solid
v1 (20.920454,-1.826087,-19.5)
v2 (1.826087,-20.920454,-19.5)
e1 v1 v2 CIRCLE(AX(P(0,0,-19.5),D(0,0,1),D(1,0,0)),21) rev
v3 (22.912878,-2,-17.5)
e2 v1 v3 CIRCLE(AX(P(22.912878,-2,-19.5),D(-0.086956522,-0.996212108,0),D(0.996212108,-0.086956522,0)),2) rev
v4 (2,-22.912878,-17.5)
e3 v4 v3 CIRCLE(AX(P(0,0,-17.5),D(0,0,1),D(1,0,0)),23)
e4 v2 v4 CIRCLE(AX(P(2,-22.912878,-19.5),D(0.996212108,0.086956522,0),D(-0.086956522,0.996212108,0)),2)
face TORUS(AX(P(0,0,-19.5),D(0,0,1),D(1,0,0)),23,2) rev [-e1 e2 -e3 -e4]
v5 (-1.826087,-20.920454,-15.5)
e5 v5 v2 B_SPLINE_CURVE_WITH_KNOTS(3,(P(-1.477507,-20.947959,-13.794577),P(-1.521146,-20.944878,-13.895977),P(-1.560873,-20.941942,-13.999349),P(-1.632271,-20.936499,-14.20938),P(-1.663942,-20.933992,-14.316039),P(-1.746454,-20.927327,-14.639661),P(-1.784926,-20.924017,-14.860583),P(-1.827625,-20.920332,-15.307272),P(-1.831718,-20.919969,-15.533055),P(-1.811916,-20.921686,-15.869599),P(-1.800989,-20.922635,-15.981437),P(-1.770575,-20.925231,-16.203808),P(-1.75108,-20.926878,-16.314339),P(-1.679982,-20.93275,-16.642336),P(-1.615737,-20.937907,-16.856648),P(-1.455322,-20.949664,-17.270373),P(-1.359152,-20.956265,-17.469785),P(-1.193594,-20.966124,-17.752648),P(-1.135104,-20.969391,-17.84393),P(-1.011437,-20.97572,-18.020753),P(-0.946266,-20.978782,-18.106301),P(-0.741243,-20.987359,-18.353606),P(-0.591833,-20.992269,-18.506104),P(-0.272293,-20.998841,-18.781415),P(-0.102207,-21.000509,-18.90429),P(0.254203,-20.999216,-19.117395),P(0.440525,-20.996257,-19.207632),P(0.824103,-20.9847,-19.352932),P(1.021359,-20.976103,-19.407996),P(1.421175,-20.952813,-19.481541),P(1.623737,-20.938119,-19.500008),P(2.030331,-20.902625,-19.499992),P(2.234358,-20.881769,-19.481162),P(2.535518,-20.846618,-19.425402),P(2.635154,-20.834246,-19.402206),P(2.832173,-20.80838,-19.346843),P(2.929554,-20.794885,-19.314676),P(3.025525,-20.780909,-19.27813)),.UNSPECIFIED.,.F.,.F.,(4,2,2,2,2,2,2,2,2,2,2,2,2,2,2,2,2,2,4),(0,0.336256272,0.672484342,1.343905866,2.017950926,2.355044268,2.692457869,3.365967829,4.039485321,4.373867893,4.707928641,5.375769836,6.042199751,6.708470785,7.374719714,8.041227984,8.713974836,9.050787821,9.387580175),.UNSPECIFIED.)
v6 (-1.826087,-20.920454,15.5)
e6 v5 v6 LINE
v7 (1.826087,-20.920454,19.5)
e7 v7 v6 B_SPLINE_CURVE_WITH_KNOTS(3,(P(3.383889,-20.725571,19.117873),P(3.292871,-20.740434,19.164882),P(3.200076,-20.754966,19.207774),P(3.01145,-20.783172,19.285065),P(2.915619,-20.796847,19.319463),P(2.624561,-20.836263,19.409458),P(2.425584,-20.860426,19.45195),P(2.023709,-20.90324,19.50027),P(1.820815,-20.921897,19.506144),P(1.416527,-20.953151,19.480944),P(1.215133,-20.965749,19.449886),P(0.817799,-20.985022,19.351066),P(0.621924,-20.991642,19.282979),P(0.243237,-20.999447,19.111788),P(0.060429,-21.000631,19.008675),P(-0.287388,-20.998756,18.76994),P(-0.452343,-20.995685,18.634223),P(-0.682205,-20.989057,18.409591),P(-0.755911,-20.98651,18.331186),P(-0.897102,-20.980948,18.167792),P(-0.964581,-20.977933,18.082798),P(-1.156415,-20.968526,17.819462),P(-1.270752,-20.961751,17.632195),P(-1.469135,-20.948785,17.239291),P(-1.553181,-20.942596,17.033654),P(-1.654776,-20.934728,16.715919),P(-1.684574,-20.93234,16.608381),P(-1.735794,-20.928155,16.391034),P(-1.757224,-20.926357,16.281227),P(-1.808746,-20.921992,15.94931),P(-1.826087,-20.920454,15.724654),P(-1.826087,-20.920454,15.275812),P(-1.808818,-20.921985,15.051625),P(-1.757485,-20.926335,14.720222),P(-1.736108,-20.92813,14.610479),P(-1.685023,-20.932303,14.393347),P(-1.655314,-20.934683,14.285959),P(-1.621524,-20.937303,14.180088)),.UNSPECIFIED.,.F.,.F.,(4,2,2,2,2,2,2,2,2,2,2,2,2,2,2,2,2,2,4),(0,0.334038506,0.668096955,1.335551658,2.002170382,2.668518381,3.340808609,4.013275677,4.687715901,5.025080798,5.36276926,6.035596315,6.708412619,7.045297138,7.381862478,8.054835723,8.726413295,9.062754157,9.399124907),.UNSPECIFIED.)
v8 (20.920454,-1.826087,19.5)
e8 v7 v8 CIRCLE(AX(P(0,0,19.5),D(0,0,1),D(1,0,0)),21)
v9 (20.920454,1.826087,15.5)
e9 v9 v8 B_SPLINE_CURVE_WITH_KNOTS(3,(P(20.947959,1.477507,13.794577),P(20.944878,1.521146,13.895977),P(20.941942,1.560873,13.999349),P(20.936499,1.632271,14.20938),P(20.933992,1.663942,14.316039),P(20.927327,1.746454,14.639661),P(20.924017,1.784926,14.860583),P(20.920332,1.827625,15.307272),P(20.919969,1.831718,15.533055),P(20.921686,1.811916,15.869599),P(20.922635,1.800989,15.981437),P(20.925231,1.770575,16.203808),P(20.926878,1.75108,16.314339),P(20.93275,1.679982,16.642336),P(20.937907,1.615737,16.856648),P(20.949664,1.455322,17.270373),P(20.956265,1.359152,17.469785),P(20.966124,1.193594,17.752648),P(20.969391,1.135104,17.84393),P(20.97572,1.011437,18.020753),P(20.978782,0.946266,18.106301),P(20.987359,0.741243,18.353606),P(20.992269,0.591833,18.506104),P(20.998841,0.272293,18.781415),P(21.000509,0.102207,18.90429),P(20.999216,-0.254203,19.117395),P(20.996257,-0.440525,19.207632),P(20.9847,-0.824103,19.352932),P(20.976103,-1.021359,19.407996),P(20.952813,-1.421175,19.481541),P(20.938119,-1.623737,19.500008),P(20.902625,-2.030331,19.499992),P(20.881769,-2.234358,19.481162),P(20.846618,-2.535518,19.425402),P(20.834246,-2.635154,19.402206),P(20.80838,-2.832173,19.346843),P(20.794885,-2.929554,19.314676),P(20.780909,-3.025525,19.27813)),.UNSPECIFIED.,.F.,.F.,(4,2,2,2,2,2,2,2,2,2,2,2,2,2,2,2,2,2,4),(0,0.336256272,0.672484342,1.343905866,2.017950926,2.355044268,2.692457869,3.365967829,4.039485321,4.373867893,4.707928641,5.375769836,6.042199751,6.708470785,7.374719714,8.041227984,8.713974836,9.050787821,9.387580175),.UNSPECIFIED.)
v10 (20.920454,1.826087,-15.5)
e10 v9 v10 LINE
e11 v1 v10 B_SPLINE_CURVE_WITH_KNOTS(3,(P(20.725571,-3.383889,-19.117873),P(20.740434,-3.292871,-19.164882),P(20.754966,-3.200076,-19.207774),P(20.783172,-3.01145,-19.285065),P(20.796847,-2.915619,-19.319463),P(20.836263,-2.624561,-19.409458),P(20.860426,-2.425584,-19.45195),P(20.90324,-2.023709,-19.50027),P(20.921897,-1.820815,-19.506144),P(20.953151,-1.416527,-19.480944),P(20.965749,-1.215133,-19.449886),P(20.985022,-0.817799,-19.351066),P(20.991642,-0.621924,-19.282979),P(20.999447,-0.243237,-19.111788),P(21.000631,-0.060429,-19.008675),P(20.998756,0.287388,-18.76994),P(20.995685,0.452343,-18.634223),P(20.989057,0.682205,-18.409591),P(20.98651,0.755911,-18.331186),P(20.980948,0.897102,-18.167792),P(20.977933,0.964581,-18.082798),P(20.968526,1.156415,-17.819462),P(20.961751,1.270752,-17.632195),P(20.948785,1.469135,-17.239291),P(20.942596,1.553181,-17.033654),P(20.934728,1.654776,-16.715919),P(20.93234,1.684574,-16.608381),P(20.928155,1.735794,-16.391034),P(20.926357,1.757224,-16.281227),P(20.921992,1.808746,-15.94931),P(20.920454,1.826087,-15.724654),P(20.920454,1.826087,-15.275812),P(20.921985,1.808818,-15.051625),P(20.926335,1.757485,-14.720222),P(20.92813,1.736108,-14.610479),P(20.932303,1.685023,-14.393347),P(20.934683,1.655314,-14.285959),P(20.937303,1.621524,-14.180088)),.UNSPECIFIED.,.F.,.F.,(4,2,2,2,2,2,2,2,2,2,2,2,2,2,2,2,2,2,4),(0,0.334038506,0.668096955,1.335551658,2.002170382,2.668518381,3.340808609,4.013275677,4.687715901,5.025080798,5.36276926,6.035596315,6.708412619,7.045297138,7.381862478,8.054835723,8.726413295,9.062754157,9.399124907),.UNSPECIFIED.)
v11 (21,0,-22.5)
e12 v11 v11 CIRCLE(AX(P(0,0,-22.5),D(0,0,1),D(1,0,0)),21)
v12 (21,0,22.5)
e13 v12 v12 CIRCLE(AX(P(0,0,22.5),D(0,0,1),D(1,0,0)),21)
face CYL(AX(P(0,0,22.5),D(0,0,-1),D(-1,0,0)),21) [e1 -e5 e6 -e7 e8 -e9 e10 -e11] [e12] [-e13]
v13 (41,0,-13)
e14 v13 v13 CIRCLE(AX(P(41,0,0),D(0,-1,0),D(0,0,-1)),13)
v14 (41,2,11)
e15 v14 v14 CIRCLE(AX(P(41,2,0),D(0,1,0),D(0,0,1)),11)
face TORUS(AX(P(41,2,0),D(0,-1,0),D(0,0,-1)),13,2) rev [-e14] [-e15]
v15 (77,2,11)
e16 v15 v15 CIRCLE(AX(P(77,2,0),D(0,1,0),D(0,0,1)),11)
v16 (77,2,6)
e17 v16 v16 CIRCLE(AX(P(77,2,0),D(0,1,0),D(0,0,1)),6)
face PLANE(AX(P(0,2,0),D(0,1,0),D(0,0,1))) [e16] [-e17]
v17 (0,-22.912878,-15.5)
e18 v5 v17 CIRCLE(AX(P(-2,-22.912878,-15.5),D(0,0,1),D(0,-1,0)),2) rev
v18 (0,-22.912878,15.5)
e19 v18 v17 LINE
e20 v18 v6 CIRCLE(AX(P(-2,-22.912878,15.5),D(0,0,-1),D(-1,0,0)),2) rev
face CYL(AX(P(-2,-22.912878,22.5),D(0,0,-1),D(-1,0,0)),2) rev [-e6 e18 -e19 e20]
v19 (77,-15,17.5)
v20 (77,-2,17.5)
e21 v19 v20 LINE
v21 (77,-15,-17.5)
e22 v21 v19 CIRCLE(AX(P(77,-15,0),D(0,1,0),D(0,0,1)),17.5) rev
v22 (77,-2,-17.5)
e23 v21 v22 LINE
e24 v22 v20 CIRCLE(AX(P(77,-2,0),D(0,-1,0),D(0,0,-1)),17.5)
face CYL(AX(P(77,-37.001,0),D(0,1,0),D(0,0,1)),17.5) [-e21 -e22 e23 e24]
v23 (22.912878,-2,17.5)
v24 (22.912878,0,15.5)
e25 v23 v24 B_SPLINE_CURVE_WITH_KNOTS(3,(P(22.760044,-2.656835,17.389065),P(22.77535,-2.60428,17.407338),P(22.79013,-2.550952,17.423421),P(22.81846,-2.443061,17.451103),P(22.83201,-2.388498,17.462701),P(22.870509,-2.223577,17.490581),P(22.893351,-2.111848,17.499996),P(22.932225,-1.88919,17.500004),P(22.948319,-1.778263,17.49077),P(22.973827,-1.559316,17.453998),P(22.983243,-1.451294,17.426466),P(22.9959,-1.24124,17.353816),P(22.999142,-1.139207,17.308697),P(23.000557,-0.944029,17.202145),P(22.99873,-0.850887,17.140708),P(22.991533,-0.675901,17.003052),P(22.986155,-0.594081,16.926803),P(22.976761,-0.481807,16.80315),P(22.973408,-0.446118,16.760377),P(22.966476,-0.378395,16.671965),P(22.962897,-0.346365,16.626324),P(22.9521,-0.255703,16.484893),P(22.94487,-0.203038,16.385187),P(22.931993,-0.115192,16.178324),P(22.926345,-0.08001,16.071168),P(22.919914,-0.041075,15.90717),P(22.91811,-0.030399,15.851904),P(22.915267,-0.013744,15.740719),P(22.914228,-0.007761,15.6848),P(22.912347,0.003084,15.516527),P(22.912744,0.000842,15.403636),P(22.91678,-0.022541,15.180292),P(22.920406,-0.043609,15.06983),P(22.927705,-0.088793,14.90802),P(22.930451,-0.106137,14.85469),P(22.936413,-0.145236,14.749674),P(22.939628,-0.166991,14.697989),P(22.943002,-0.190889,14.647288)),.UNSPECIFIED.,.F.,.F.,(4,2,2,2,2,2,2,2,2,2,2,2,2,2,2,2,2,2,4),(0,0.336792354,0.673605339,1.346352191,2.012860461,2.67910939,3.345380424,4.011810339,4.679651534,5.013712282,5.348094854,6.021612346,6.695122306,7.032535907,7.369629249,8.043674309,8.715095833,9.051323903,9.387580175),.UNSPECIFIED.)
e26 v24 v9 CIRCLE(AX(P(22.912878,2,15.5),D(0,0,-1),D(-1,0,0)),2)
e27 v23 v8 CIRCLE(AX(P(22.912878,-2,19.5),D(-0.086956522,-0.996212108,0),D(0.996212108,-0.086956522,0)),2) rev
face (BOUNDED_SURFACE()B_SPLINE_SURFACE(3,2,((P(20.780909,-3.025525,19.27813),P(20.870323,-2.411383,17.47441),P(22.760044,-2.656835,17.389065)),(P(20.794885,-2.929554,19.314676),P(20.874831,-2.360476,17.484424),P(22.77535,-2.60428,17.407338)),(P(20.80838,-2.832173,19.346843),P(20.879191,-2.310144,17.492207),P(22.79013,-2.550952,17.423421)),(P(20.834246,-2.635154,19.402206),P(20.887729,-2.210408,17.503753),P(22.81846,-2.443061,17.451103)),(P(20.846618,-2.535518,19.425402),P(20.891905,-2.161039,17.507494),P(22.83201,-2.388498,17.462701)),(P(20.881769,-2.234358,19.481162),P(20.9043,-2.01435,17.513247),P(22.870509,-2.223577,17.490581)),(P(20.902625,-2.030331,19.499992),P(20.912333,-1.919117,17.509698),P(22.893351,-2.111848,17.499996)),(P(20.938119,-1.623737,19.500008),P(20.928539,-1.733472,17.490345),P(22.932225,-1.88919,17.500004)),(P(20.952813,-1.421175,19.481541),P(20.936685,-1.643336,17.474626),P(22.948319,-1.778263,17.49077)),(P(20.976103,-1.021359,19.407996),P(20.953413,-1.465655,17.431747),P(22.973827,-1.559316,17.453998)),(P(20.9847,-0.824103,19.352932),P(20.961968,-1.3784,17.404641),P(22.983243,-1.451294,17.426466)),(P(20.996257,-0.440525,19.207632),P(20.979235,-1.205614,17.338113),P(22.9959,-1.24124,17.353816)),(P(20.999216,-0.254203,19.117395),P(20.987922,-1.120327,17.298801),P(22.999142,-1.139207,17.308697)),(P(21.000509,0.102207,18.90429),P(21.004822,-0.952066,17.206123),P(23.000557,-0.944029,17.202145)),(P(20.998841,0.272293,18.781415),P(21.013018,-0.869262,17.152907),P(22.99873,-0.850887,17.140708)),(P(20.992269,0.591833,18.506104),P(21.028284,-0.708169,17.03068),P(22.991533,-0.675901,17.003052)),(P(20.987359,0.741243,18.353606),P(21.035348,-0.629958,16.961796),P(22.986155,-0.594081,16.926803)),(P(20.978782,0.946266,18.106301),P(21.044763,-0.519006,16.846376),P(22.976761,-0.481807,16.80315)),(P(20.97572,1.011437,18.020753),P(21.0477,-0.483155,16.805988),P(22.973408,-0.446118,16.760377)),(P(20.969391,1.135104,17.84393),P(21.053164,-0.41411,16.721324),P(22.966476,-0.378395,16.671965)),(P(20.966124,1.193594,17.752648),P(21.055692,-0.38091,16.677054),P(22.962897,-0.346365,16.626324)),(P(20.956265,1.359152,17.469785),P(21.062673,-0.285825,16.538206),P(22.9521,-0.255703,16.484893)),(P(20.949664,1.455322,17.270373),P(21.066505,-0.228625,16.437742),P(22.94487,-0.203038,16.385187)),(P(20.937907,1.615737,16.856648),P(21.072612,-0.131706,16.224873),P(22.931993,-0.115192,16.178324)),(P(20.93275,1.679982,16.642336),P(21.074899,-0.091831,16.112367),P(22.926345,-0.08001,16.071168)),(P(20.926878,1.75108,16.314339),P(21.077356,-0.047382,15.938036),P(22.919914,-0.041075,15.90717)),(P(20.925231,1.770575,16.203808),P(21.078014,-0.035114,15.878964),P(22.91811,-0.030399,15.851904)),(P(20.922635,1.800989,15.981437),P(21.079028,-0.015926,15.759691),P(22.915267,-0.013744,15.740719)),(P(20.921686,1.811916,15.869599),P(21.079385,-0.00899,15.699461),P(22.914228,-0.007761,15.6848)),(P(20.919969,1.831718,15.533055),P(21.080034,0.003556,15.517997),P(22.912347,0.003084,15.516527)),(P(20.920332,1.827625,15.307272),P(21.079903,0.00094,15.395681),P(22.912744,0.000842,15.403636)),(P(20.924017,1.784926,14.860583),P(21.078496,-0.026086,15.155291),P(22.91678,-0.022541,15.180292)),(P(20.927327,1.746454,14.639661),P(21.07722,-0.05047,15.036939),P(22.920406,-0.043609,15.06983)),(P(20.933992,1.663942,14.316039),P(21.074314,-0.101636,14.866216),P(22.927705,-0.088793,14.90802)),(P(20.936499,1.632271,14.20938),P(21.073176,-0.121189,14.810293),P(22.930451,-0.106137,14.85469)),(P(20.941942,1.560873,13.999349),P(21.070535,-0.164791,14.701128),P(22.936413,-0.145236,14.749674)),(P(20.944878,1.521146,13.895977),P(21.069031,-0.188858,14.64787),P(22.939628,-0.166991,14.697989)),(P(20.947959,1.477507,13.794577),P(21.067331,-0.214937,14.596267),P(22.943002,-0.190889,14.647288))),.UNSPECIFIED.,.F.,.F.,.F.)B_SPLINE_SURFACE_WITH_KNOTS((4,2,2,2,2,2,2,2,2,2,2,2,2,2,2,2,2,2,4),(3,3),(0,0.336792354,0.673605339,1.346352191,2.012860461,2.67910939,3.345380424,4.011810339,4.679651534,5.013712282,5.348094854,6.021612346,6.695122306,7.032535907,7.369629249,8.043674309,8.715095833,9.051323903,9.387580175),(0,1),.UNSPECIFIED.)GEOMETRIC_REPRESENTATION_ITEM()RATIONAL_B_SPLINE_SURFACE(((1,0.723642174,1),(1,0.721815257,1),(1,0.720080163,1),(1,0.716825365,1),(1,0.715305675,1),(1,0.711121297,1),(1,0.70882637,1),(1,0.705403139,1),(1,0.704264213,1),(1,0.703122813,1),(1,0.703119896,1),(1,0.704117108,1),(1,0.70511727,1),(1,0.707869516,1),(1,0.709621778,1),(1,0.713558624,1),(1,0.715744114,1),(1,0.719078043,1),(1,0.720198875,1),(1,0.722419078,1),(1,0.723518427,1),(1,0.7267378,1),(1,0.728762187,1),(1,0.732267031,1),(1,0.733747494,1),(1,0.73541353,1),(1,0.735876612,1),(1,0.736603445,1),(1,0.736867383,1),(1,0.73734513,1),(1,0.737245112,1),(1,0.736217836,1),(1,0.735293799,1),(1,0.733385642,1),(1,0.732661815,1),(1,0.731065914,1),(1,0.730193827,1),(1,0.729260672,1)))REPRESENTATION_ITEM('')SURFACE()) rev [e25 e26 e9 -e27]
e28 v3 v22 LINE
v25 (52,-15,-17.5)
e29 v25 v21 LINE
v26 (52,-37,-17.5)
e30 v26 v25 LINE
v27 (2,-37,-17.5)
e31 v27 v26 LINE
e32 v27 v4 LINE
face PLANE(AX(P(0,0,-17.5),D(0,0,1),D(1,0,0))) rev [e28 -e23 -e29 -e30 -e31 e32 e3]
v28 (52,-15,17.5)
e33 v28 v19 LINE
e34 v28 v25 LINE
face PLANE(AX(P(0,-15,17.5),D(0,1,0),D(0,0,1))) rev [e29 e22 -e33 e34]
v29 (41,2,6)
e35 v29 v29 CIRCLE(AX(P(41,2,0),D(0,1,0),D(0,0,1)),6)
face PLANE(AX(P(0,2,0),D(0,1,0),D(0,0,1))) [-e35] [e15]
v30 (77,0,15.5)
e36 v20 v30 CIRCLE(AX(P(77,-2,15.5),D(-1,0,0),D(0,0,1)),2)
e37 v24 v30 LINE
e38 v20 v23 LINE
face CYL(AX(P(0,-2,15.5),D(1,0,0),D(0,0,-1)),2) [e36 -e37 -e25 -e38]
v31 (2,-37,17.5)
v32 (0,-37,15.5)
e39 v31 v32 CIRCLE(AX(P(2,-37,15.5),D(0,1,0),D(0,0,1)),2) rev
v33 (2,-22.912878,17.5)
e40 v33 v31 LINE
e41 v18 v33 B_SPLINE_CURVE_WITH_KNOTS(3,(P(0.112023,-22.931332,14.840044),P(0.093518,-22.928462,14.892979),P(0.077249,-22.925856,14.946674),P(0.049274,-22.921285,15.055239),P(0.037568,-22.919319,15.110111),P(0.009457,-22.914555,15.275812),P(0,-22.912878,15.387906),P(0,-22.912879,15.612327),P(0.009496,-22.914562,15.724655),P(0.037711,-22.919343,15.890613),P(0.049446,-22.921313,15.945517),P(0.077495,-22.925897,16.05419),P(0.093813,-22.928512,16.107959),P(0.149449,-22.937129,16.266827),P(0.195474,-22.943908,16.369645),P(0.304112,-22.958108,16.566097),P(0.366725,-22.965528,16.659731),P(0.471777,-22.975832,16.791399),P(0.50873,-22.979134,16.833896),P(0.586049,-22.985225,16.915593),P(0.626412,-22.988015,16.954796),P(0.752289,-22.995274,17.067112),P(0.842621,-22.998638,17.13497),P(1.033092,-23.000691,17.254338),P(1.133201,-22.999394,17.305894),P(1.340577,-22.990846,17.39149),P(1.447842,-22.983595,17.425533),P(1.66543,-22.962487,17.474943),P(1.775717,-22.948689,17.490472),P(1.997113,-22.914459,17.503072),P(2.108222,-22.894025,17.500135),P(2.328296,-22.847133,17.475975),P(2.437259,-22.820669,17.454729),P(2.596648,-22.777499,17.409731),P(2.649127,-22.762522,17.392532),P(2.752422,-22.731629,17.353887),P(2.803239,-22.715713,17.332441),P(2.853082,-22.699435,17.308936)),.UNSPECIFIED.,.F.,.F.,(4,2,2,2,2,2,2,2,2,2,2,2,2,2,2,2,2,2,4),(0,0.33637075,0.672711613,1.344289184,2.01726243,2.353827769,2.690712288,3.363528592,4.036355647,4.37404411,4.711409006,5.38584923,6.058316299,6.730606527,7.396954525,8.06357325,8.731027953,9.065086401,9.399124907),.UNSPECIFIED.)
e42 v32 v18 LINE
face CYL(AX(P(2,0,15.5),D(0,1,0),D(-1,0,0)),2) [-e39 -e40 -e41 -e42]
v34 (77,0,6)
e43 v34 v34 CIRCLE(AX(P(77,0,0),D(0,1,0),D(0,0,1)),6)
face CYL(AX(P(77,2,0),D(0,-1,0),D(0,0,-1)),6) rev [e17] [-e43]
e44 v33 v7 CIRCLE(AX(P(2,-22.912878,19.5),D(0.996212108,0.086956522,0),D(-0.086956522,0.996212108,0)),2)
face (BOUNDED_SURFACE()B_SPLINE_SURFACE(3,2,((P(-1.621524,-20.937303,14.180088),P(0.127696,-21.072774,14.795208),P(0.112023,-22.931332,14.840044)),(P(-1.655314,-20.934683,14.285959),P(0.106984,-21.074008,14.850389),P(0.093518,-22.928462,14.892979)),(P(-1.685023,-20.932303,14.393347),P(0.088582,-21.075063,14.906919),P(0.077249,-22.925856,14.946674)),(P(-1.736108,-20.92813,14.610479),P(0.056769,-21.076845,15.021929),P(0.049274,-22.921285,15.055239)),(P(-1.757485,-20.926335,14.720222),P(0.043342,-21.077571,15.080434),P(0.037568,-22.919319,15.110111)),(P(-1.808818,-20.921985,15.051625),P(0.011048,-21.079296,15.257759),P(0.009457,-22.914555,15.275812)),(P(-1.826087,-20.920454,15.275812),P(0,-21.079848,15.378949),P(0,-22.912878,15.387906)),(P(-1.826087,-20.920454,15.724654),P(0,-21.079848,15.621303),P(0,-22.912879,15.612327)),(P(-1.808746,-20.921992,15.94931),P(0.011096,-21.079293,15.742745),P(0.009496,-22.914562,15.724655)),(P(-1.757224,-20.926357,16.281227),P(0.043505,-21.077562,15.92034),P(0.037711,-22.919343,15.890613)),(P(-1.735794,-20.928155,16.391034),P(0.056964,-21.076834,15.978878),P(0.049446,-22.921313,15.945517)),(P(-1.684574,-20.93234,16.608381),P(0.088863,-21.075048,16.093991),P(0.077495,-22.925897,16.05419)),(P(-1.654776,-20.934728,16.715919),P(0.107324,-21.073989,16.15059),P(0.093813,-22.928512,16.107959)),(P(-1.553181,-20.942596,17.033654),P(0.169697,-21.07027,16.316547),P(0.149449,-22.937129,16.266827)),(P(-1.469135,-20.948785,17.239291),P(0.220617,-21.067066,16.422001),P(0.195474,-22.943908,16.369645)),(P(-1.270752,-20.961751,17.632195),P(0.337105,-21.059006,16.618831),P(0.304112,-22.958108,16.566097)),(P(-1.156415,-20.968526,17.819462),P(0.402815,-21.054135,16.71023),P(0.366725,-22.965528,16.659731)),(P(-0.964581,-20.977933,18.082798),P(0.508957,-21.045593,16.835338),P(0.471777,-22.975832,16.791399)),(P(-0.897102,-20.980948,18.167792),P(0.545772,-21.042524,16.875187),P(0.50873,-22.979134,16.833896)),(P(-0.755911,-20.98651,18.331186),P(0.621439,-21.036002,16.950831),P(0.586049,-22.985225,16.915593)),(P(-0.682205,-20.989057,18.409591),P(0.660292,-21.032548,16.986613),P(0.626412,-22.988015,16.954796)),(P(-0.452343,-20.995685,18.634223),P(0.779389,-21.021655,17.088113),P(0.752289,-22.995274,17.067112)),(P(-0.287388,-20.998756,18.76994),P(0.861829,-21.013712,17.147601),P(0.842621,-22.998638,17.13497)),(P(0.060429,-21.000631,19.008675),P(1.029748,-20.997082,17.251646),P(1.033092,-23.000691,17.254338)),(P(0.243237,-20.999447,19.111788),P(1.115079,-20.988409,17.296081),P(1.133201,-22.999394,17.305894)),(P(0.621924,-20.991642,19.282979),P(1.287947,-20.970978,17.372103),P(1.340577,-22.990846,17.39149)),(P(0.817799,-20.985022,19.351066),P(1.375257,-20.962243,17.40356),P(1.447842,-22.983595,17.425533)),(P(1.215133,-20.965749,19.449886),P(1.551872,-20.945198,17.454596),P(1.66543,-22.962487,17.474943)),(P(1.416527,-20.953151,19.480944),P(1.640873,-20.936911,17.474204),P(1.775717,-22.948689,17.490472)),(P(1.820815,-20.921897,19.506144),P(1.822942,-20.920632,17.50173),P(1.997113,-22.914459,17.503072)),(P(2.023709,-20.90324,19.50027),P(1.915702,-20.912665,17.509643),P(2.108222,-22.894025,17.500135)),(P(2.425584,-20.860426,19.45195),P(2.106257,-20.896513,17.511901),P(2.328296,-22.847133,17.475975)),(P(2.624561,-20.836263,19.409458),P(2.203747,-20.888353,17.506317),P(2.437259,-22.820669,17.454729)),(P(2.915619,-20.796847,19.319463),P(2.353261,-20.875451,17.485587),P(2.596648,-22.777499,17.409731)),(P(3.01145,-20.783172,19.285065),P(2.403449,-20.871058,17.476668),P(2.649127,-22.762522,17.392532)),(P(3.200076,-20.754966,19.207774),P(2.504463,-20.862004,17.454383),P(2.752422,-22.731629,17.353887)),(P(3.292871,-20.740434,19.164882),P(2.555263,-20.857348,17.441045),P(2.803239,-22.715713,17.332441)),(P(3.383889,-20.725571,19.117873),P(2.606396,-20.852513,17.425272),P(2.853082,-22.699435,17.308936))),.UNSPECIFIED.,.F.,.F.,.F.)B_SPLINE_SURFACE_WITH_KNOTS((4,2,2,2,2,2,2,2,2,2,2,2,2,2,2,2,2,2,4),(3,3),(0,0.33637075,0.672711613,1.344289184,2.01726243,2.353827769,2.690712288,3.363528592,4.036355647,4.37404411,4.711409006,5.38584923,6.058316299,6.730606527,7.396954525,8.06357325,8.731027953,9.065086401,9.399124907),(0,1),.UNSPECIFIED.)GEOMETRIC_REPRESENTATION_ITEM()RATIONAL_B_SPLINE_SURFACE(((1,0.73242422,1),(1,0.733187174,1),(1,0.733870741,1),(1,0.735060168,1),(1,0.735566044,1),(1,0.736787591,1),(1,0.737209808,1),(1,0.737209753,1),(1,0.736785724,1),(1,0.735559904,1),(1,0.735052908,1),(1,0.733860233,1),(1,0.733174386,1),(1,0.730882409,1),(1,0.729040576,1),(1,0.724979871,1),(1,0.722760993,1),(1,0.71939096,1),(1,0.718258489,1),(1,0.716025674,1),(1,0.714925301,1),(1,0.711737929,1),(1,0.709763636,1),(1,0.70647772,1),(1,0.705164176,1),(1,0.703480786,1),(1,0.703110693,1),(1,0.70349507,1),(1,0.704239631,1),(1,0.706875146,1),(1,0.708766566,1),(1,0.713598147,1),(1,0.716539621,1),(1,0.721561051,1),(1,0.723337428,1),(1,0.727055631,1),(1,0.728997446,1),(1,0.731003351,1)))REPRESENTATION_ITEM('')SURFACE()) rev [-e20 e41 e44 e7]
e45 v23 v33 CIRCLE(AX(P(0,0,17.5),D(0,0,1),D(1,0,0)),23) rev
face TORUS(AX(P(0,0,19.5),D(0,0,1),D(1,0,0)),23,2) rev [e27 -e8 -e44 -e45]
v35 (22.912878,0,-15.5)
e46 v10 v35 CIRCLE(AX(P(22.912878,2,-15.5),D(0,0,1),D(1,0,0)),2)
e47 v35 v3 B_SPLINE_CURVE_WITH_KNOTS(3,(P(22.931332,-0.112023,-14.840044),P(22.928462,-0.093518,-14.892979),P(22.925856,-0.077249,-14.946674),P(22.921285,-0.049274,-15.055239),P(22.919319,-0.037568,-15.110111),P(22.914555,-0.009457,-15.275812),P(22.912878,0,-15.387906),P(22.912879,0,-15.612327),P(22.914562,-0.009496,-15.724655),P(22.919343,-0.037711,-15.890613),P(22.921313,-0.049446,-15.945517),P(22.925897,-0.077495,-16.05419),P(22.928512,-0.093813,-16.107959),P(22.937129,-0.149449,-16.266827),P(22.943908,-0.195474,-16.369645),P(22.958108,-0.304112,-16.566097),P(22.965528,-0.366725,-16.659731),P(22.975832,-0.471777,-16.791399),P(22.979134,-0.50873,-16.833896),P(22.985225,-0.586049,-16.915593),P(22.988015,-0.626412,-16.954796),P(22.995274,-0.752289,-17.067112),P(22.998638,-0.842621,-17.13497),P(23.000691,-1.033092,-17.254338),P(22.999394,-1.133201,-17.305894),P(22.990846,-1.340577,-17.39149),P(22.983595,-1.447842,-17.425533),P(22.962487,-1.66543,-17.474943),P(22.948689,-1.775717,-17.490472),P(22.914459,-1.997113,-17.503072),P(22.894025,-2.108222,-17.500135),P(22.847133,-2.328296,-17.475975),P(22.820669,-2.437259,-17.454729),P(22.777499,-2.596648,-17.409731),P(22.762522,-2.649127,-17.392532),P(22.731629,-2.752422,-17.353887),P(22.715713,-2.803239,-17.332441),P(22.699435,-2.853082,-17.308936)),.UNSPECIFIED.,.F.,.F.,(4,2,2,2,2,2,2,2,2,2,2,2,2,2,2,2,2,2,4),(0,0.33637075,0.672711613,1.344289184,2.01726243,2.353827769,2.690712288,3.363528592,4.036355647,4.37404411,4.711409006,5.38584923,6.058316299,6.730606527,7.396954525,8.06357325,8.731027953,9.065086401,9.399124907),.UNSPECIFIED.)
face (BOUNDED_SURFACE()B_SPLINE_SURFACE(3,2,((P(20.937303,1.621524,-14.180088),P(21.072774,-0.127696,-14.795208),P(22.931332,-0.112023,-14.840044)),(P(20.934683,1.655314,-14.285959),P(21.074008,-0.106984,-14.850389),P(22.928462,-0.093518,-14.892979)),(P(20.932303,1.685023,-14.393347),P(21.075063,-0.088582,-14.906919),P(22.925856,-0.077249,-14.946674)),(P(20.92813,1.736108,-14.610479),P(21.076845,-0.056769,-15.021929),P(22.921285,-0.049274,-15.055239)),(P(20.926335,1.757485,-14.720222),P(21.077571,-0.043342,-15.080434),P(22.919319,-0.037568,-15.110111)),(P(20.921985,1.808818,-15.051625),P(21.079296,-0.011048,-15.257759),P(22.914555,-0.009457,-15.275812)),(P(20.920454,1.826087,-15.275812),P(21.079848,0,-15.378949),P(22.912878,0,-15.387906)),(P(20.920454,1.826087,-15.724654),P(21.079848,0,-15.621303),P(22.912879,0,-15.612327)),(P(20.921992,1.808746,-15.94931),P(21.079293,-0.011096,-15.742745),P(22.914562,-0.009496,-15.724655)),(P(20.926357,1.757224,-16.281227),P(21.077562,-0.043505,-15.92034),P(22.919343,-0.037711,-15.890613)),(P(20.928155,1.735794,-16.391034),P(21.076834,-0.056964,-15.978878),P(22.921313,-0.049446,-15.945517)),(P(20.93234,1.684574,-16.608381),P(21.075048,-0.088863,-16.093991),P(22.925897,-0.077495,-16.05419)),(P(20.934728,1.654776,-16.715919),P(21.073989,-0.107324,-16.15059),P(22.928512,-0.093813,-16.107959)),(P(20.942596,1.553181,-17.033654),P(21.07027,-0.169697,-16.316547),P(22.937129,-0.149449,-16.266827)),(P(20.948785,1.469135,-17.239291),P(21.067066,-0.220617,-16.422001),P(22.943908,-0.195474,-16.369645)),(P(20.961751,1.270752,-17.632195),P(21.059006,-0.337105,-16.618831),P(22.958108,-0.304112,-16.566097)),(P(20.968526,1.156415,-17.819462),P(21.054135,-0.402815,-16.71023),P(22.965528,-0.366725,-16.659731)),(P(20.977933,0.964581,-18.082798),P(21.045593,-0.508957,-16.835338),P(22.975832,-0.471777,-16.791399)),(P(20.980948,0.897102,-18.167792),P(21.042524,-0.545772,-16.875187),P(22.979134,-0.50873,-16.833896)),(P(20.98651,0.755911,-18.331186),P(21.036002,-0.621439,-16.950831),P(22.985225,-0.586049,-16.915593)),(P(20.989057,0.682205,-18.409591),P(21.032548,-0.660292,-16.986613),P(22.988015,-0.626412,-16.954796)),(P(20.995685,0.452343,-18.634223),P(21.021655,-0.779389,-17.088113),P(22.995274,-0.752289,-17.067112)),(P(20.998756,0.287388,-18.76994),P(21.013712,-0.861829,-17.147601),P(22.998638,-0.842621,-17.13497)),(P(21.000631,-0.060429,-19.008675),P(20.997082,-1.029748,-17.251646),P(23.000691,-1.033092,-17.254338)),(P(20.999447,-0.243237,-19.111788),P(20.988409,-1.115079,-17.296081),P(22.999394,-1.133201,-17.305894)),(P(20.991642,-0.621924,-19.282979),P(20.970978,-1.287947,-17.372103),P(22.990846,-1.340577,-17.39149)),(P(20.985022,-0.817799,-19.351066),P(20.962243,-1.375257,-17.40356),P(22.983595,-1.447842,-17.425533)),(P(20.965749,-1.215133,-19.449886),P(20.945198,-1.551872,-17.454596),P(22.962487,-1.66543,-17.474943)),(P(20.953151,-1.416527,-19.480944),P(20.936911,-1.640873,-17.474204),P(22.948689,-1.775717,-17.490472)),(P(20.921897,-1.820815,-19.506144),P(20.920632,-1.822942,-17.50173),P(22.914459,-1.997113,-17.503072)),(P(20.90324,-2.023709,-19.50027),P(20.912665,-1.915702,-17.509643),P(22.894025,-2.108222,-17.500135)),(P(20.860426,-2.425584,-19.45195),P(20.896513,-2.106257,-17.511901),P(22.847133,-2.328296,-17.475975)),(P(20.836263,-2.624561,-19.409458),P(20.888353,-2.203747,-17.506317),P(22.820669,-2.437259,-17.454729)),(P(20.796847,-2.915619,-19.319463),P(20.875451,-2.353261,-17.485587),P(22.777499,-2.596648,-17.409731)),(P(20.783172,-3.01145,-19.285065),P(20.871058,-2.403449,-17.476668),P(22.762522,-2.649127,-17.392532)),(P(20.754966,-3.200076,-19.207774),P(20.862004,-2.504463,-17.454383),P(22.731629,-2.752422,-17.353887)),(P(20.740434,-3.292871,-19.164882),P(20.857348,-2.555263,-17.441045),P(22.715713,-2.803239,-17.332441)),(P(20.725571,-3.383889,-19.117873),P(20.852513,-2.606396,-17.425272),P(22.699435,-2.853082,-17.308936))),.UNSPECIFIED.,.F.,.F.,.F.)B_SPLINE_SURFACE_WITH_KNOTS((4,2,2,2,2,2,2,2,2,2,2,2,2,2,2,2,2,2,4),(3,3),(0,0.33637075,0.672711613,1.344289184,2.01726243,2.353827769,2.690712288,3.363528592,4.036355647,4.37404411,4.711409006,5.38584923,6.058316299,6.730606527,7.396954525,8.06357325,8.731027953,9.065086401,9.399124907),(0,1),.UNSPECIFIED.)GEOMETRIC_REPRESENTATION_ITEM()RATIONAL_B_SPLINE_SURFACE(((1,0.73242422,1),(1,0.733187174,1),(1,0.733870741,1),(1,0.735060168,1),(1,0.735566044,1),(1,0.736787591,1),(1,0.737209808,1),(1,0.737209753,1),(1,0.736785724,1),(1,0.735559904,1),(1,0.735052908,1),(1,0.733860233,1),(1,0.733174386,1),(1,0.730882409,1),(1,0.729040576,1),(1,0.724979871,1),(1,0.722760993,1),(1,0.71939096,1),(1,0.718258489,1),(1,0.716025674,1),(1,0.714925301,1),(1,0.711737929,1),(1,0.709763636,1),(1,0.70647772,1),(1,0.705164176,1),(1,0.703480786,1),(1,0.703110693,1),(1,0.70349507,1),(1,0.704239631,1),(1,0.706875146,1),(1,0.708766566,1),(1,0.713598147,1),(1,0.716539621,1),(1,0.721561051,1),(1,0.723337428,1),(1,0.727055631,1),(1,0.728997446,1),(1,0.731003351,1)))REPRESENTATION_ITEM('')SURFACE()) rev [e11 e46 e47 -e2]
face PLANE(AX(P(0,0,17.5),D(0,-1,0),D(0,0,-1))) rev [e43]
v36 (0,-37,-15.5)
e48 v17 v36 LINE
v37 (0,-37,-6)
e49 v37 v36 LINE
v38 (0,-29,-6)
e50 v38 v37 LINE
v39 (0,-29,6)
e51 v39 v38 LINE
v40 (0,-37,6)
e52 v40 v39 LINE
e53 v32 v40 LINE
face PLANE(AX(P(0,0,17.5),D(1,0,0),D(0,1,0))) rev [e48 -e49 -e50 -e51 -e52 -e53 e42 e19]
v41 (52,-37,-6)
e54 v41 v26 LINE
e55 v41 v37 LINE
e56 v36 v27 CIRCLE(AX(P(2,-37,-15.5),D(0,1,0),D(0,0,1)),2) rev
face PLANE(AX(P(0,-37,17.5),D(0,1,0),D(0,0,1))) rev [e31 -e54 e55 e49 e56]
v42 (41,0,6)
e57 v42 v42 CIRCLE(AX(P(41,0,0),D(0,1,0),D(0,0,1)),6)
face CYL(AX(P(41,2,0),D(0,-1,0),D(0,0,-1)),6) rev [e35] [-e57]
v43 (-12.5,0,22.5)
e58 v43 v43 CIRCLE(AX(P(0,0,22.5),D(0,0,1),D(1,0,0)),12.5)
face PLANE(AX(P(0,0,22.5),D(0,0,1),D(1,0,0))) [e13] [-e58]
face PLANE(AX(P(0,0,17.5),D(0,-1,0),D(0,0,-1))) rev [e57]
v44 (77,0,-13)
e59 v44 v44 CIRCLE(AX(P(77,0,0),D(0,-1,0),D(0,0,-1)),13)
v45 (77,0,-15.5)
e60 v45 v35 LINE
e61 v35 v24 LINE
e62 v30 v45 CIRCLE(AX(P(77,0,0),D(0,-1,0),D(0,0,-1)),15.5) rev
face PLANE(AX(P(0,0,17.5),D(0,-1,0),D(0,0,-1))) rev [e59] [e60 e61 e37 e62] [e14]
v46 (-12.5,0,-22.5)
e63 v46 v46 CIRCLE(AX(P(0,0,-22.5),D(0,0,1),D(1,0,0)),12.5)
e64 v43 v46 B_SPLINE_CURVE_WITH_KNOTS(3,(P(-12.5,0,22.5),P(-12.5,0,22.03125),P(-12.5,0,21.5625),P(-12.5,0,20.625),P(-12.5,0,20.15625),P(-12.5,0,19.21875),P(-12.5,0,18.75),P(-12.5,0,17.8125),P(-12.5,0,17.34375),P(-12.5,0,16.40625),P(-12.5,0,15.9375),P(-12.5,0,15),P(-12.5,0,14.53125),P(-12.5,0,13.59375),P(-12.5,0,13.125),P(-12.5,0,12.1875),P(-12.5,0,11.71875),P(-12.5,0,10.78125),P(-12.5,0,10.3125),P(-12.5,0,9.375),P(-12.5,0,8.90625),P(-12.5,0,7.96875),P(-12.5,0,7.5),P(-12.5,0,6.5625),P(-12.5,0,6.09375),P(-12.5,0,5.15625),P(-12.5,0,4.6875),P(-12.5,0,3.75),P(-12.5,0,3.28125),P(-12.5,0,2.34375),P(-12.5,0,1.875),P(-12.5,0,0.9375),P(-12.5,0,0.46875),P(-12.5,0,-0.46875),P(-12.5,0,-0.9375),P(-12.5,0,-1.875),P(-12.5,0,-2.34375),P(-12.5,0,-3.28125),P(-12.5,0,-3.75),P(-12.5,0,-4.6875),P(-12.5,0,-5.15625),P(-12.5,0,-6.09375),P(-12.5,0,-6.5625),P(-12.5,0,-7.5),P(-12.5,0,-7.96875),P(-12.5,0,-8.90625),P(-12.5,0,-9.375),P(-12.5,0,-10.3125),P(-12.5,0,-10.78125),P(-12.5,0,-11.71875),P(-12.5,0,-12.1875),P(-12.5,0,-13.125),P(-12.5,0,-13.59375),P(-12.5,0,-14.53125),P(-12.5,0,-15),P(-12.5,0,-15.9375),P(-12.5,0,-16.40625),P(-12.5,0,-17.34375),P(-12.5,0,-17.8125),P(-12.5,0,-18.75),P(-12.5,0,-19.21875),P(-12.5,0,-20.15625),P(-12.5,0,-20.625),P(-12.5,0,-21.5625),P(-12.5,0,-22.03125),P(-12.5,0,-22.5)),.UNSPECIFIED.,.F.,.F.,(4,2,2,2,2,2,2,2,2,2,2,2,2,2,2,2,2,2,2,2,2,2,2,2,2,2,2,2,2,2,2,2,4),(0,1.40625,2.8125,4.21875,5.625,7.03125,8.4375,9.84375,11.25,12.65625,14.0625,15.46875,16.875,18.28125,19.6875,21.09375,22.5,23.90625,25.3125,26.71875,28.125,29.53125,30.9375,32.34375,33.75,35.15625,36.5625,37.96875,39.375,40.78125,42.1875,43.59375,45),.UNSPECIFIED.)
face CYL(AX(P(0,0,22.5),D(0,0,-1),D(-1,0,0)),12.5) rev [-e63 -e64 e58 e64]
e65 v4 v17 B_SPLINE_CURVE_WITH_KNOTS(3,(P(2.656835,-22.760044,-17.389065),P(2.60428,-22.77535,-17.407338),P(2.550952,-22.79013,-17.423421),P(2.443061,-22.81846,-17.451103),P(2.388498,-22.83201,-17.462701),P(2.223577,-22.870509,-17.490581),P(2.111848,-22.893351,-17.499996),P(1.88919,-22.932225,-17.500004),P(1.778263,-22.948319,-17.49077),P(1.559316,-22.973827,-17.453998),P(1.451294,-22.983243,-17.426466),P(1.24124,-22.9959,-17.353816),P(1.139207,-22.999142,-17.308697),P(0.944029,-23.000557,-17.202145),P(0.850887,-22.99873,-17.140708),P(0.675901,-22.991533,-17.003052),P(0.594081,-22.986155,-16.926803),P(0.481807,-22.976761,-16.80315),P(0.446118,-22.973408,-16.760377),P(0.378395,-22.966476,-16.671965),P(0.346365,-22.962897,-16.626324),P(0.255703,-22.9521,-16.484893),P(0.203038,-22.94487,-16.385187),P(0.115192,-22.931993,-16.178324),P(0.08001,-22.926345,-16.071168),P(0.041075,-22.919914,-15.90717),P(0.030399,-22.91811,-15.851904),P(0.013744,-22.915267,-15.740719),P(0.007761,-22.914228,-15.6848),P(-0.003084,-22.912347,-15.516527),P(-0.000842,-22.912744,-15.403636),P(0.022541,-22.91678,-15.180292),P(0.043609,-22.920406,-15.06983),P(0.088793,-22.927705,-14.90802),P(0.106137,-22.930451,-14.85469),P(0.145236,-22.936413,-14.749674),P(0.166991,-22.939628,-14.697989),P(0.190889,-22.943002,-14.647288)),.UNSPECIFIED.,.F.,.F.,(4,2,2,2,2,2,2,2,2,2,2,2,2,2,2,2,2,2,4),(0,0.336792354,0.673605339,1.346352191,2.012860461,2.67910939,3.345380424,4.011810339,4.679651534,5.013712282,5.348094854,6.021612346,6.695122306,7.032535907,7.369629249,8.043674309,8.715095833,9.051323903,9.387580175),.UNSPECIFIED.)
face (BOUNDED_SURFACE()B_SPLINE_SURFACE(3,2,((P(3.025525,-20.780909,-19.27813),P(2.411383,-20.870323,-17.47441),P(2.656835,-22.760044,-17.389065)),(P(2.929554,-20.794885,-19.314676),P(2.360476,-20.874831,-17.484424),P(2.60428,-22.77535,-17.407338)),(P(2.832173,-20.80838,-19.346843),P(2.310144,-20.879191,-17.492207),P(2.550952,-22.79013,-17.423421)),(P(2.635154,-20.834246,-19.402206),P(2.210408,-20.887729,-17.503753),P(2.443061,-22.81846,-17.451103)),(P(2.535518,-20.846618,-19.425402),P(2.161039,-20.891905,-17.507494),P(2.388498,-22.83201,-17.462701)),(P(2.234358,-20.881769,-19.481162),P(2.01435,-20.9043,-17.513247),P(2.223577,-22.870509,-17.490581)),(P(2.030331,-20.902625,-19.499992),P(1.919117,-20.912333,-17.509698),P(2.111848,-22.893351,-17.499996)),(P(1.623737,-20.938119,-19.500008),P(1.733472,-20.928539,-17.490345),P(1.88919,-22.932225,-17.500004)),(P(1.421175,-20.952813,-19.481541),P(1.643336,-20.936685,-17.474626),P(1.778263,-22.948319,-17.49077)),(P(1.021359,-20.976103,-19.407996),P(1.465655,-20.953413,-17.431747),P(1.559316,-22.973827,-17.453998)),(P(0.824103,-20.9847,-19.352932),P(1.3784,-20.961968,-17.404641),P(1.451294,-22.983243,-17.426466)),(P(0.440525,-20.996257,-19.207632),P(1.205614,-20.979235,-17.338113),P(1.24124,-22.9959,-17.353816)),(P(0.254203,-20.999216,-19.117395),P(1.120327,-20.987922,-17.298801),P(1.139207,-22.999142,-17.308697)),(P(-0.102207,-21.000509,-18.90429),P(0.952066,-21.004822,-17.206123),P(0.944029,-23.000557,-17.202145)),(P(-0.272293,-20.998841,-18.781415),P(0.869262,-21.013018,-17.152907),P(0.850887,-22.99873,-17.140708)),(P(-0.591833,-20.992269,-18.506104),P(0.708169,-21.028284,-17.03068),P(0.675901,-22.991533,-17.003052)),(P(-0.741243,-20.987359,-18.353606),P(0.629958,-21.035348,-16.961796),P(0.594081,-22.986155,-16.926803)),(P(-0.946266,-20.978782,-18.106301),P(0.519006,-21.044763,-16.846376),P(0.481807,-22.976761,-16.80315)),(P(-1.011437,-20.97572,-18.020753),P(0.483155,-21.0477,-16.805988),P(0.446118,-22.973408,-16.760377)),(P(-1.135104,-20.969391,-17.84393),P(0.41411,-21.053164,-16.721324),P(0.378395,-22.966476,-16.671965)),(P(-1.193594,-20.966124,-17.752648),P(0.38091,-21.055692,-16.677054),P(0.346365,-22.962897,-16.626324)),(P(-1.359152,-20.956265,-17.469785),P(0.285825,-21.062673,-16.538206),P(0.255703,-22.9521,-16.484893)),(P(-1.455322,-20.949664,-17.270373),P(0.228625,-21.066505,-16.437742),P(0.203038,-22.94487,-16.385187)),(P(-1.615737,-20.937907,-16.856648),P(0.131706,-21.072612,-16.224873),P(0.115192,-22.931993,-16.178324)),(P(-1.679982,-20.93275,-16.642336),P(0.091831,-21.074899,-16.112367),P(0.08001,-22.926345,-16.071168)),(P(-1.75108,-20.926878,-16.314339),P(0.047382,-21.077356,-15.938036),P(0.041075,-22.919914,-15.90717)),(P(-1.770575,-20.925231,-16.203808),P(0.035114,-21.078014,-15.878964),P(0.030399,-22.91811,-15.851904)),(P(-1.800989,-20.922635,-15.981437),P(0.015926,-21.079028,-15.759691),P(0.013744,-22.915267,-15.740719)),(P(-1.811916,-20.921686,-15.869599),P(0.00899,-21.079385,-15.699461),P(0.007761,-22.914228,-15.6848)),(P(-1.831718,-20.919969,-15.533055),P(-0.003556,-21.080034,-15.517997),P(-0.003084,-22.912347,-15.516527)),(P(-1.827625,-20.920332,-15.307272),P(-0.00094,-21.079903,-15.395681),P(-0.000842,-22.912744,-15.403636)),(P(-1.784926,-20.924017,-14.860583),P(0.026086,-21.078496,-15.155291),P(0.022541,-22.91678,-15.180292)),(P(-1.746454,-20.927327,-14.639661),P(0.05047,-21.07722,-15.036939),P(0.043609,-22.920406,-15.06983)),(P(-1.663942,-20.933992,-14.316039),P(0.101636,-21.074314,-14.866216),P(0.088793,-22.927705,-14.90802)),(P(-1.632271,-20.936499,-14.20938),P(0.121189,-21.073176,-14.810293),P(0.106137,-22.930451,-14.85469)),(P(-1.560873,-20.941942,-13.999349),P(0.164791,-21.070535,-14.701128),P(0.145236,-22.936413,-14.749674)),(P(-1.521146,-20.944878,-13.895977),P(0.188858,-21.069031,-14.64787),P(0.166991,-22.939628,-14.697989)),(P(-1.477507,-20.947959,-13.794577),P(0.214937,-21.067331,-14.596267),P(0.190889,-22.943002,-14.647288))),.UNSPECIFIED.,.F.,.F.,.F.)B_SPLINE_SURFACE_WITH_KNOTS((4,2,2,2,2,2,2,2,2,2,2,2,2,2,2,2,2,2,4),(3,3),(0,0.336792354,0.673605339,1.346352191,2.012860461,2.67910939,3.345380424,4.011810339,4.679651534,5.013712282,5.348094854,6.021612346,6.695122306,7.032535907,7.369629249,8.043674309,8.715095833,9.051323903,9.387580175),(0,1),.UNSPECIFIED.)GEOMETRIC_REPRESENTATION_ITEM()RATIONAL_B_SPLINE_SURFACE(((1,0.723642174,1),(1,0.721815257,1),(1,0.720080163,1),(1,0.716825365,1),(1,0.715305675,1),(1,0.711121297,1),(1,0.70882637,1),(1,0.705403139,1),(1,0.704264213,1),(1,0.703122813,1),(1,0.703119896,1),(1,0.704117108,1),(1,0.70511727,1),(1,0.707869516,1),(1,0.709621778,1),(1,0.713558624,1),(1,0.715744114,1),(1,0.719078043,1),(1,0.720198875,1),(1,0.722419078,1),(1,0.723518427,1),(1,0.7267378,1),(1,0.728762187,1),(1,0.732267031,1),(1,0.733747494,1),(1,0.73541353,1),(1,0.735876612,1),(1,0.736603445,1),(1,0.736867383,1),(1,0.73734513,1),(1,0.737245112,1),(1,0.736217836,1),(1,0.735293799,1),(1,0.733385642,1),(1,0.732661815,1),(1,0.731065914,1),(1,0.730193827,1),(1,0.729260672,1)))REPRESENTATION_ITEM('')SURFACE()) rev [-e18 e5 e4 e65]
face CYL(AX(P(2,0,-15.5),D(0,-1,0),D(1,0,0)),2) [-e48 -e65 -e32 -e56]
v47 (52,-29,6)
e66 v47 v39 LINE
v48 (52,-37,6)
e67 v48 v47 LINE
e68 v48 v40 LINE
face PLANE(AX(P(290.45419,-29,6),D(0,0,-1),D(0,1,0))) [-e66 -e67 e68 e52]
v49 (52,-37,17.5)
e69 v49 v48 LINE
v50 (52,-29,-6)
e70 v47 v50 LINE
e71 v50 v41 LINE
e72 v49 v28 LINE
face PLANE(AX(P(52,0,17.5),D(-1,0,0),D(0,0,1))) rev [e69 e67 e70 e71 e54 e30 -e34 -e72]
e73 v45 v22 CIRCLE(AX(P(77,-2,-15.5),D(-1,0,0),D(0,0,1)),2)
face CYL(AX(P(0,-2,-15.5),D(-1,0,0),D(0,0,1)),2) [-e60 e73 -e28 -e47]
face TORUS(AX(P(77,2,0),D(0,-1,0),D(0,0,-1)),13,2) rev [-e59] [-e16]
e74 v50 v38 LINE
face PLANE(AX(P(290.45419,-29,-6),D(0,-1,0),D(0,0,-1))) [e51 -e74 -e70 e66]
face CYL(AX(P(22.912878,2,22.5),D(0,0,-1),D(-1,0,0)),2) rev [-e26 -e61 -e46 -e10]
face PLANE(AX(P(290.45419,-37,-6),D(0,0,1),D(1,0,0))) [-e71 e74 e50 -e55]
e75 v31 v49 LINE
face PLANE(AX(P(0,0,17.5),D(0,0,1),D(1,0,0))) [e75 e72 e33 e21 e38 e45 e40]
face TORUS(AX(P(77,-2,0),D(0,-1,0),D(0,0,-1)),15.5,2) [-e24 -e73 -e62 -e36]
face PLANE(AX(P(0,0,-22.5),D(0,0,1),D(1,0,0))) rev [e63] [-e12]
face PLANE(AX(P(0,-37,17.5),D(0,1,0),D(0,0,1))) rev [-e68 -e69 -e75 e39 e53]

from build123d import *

# Parameters (mm, degrees)
SKETCH3_R               = 21
SKETCH3_R_2             = 12.5
BOSS_EXTRUDE1_DEPTH     = 22.5
BOSS_EXTRUDE2_DEPTH     = 17.5
CUT_EXTRUDE1_DEPTH      = 85.877853413
CUT_EXTRUDE1_DEPTH_BACK = 53
BOSS_EXTRUDE3_DEPTH     = 2
CUT_EXTRUDE2_REACH      = 121.386
FILLET1_R               = 2


with BuildPart() as part:
    # Sketch3 → Boss-Extrude1 (new, symmetric)
    with BuildSketch(Plane.XY):
        with Locations(Location((0, 0, 0), (0, 0, 180))):
            Circle(SKETCH3_R)
        with Locations(Location((0, 0, 0), (0, 0, 180))):
            Circle(SKETCH3_R_2, mode=Mode.SUBTRACT)
    extrude(amount=BOSS_EXTRUDE1_DEPTH, both=True)

    # Sketch3<3> → Boss-Extrude2 (add, symmetric)
    with BuildSketch(Plane.XY):
        with BuildLine():
            ThreePointArc((21, 0), (14.849242405, -14.849242405), (0, -21))
            Line((0, -21), (0, -37))
            Line((0, -37), (52, -37))
            Line((52, -37), (52, -15))
            Line((52, -15), (111.255819071, -15))
            Line((111.255819071, -15), (111.255819071, 0))
            Line((111.255819071, 0), (21, 0))
        make_face()
    extrude(amount=BOSS_EXTRUDE2_DEPTH, both=True)

    # Sketch5 → Cut-Extrude1 (cut, two sides: drawn at the far end of the back side and taken through both)
    with BuildSketch(Plane(origin=(52, 0, 0), x_dir=(0, 0, -1), z_dir=(1, 0, 0)).offset(-CUT_EXTRUDE1_DEPTH_BACK)):
        Polygon((6, -176.247823966), (6, -37), (6, -29), (-6, -29), (-6, -37), (-6, -176.247823966), (-6, -454.743471899), (6, -454.743471899), align=None)
    extrude(amount=CUT_EXTRUDE1_DEPTH + CUT_EXTRUDE1_DEPTH_BACK, mode=Mode.SUBTRACT)

    # Sketch4 → Boss-Extrude3 (add)
    with BuildSketch(Plane(origin=(0, 0, 0), x_dir=(1, 0, 0), z_dir=(0, 1, 0))):
        with BuildLine():
            ThreePointArc((35, 0), (41, 6), (47, 0))
            Line((47, 0), (52, 0))
            ThreePointArc((52, 0), (41, 11), (30, 0))
            Line((30, 0), (35, 0))
        make_face()
        with BuildLine():
            Line((52, 0), (47, 0))
            ThreePointArc((47, 0), (41, -6), (35, 0))
            Line((35, 0), (30, 0))
            ThreePointArc((30, 0), (41, -11), (52, 0))
        make_face()
        with BuildLine():
            ThreePointArc((88, 0), (77, 11), (66, 0))
            Line((66, 0), (71, 0))
            ThreePointArc((71, 0), (77, 6), (83, 0))
            Line((83, 0), (88, 0))
        make_face()
        with BuildLine():
            Line((71, 0), (66, 0))
            ThreePointArc((66, 0), (77, -11), (88, 0))
            Line((88, 0), (83, 0))
            ThreePointArc((83, 0), (77, -6), (71, 0))
        make_face()
    extrude(amount=BOSS_EXTRUDE3_DEPTH)

    # Sketch4<3> → Cut-Extrude2 (cut, up to next)
    with BuildSketch(Plane(origin=(0, 0, 0), x_dir=(1, 0, 0), z_dir=(0, 1, 0)), mode=Mode.PRIVATE) as cut_extrude2_sk1:
        with BuildLine():
            ThreePointArc((77, 17.5), (89.374368671, 12.374368671), (94.5, 0))
            ThreePointArc((94.5, 0), (89.374368671, -12.374368671), (77, -17.5))
            Line((77, -17.5), (111.255819071, -17.5))
            Line((111.255819071, -17.5), (111.255819071, 17.5))
            Line((111.255819071, 17.5), (77, 17.5))
        make_face()
    cut_extrude2_tool1 = extrude(cut_extrude2_sk1.sketch, amount=-CUT_EXTRUDE2_REACH, mode=Mode.PRIVATE) & part.part
    add(cut_extrude2_tool1.solids().sort_by_distance((100.628245, 0, 0))[0], mode=Mode.SUBTRACT)

    # Fillet1
    fillet1_edges = [part.edges().sort_by_distance(p)[0] for p in [
        (14.849242405, -14.849242405, 17.5),
        (21, 0, 0),
        (0, -29, -17.5),
        (0, -21, 0),
        (0, -29, 17.5),
        (14.849242405, -14.849242405, -17.5),
        (66, 0, 0),
        (30, 0, 0),
        (49, 0, -17.5),
        (49, 0, 17.5),
        (94.5, 0, 0),
    ]]
    fillet(fillet1_edges, radius=FILLET1_R - 0.0001)  # a hair under: the kernel refuses the full size


solid = part.part
